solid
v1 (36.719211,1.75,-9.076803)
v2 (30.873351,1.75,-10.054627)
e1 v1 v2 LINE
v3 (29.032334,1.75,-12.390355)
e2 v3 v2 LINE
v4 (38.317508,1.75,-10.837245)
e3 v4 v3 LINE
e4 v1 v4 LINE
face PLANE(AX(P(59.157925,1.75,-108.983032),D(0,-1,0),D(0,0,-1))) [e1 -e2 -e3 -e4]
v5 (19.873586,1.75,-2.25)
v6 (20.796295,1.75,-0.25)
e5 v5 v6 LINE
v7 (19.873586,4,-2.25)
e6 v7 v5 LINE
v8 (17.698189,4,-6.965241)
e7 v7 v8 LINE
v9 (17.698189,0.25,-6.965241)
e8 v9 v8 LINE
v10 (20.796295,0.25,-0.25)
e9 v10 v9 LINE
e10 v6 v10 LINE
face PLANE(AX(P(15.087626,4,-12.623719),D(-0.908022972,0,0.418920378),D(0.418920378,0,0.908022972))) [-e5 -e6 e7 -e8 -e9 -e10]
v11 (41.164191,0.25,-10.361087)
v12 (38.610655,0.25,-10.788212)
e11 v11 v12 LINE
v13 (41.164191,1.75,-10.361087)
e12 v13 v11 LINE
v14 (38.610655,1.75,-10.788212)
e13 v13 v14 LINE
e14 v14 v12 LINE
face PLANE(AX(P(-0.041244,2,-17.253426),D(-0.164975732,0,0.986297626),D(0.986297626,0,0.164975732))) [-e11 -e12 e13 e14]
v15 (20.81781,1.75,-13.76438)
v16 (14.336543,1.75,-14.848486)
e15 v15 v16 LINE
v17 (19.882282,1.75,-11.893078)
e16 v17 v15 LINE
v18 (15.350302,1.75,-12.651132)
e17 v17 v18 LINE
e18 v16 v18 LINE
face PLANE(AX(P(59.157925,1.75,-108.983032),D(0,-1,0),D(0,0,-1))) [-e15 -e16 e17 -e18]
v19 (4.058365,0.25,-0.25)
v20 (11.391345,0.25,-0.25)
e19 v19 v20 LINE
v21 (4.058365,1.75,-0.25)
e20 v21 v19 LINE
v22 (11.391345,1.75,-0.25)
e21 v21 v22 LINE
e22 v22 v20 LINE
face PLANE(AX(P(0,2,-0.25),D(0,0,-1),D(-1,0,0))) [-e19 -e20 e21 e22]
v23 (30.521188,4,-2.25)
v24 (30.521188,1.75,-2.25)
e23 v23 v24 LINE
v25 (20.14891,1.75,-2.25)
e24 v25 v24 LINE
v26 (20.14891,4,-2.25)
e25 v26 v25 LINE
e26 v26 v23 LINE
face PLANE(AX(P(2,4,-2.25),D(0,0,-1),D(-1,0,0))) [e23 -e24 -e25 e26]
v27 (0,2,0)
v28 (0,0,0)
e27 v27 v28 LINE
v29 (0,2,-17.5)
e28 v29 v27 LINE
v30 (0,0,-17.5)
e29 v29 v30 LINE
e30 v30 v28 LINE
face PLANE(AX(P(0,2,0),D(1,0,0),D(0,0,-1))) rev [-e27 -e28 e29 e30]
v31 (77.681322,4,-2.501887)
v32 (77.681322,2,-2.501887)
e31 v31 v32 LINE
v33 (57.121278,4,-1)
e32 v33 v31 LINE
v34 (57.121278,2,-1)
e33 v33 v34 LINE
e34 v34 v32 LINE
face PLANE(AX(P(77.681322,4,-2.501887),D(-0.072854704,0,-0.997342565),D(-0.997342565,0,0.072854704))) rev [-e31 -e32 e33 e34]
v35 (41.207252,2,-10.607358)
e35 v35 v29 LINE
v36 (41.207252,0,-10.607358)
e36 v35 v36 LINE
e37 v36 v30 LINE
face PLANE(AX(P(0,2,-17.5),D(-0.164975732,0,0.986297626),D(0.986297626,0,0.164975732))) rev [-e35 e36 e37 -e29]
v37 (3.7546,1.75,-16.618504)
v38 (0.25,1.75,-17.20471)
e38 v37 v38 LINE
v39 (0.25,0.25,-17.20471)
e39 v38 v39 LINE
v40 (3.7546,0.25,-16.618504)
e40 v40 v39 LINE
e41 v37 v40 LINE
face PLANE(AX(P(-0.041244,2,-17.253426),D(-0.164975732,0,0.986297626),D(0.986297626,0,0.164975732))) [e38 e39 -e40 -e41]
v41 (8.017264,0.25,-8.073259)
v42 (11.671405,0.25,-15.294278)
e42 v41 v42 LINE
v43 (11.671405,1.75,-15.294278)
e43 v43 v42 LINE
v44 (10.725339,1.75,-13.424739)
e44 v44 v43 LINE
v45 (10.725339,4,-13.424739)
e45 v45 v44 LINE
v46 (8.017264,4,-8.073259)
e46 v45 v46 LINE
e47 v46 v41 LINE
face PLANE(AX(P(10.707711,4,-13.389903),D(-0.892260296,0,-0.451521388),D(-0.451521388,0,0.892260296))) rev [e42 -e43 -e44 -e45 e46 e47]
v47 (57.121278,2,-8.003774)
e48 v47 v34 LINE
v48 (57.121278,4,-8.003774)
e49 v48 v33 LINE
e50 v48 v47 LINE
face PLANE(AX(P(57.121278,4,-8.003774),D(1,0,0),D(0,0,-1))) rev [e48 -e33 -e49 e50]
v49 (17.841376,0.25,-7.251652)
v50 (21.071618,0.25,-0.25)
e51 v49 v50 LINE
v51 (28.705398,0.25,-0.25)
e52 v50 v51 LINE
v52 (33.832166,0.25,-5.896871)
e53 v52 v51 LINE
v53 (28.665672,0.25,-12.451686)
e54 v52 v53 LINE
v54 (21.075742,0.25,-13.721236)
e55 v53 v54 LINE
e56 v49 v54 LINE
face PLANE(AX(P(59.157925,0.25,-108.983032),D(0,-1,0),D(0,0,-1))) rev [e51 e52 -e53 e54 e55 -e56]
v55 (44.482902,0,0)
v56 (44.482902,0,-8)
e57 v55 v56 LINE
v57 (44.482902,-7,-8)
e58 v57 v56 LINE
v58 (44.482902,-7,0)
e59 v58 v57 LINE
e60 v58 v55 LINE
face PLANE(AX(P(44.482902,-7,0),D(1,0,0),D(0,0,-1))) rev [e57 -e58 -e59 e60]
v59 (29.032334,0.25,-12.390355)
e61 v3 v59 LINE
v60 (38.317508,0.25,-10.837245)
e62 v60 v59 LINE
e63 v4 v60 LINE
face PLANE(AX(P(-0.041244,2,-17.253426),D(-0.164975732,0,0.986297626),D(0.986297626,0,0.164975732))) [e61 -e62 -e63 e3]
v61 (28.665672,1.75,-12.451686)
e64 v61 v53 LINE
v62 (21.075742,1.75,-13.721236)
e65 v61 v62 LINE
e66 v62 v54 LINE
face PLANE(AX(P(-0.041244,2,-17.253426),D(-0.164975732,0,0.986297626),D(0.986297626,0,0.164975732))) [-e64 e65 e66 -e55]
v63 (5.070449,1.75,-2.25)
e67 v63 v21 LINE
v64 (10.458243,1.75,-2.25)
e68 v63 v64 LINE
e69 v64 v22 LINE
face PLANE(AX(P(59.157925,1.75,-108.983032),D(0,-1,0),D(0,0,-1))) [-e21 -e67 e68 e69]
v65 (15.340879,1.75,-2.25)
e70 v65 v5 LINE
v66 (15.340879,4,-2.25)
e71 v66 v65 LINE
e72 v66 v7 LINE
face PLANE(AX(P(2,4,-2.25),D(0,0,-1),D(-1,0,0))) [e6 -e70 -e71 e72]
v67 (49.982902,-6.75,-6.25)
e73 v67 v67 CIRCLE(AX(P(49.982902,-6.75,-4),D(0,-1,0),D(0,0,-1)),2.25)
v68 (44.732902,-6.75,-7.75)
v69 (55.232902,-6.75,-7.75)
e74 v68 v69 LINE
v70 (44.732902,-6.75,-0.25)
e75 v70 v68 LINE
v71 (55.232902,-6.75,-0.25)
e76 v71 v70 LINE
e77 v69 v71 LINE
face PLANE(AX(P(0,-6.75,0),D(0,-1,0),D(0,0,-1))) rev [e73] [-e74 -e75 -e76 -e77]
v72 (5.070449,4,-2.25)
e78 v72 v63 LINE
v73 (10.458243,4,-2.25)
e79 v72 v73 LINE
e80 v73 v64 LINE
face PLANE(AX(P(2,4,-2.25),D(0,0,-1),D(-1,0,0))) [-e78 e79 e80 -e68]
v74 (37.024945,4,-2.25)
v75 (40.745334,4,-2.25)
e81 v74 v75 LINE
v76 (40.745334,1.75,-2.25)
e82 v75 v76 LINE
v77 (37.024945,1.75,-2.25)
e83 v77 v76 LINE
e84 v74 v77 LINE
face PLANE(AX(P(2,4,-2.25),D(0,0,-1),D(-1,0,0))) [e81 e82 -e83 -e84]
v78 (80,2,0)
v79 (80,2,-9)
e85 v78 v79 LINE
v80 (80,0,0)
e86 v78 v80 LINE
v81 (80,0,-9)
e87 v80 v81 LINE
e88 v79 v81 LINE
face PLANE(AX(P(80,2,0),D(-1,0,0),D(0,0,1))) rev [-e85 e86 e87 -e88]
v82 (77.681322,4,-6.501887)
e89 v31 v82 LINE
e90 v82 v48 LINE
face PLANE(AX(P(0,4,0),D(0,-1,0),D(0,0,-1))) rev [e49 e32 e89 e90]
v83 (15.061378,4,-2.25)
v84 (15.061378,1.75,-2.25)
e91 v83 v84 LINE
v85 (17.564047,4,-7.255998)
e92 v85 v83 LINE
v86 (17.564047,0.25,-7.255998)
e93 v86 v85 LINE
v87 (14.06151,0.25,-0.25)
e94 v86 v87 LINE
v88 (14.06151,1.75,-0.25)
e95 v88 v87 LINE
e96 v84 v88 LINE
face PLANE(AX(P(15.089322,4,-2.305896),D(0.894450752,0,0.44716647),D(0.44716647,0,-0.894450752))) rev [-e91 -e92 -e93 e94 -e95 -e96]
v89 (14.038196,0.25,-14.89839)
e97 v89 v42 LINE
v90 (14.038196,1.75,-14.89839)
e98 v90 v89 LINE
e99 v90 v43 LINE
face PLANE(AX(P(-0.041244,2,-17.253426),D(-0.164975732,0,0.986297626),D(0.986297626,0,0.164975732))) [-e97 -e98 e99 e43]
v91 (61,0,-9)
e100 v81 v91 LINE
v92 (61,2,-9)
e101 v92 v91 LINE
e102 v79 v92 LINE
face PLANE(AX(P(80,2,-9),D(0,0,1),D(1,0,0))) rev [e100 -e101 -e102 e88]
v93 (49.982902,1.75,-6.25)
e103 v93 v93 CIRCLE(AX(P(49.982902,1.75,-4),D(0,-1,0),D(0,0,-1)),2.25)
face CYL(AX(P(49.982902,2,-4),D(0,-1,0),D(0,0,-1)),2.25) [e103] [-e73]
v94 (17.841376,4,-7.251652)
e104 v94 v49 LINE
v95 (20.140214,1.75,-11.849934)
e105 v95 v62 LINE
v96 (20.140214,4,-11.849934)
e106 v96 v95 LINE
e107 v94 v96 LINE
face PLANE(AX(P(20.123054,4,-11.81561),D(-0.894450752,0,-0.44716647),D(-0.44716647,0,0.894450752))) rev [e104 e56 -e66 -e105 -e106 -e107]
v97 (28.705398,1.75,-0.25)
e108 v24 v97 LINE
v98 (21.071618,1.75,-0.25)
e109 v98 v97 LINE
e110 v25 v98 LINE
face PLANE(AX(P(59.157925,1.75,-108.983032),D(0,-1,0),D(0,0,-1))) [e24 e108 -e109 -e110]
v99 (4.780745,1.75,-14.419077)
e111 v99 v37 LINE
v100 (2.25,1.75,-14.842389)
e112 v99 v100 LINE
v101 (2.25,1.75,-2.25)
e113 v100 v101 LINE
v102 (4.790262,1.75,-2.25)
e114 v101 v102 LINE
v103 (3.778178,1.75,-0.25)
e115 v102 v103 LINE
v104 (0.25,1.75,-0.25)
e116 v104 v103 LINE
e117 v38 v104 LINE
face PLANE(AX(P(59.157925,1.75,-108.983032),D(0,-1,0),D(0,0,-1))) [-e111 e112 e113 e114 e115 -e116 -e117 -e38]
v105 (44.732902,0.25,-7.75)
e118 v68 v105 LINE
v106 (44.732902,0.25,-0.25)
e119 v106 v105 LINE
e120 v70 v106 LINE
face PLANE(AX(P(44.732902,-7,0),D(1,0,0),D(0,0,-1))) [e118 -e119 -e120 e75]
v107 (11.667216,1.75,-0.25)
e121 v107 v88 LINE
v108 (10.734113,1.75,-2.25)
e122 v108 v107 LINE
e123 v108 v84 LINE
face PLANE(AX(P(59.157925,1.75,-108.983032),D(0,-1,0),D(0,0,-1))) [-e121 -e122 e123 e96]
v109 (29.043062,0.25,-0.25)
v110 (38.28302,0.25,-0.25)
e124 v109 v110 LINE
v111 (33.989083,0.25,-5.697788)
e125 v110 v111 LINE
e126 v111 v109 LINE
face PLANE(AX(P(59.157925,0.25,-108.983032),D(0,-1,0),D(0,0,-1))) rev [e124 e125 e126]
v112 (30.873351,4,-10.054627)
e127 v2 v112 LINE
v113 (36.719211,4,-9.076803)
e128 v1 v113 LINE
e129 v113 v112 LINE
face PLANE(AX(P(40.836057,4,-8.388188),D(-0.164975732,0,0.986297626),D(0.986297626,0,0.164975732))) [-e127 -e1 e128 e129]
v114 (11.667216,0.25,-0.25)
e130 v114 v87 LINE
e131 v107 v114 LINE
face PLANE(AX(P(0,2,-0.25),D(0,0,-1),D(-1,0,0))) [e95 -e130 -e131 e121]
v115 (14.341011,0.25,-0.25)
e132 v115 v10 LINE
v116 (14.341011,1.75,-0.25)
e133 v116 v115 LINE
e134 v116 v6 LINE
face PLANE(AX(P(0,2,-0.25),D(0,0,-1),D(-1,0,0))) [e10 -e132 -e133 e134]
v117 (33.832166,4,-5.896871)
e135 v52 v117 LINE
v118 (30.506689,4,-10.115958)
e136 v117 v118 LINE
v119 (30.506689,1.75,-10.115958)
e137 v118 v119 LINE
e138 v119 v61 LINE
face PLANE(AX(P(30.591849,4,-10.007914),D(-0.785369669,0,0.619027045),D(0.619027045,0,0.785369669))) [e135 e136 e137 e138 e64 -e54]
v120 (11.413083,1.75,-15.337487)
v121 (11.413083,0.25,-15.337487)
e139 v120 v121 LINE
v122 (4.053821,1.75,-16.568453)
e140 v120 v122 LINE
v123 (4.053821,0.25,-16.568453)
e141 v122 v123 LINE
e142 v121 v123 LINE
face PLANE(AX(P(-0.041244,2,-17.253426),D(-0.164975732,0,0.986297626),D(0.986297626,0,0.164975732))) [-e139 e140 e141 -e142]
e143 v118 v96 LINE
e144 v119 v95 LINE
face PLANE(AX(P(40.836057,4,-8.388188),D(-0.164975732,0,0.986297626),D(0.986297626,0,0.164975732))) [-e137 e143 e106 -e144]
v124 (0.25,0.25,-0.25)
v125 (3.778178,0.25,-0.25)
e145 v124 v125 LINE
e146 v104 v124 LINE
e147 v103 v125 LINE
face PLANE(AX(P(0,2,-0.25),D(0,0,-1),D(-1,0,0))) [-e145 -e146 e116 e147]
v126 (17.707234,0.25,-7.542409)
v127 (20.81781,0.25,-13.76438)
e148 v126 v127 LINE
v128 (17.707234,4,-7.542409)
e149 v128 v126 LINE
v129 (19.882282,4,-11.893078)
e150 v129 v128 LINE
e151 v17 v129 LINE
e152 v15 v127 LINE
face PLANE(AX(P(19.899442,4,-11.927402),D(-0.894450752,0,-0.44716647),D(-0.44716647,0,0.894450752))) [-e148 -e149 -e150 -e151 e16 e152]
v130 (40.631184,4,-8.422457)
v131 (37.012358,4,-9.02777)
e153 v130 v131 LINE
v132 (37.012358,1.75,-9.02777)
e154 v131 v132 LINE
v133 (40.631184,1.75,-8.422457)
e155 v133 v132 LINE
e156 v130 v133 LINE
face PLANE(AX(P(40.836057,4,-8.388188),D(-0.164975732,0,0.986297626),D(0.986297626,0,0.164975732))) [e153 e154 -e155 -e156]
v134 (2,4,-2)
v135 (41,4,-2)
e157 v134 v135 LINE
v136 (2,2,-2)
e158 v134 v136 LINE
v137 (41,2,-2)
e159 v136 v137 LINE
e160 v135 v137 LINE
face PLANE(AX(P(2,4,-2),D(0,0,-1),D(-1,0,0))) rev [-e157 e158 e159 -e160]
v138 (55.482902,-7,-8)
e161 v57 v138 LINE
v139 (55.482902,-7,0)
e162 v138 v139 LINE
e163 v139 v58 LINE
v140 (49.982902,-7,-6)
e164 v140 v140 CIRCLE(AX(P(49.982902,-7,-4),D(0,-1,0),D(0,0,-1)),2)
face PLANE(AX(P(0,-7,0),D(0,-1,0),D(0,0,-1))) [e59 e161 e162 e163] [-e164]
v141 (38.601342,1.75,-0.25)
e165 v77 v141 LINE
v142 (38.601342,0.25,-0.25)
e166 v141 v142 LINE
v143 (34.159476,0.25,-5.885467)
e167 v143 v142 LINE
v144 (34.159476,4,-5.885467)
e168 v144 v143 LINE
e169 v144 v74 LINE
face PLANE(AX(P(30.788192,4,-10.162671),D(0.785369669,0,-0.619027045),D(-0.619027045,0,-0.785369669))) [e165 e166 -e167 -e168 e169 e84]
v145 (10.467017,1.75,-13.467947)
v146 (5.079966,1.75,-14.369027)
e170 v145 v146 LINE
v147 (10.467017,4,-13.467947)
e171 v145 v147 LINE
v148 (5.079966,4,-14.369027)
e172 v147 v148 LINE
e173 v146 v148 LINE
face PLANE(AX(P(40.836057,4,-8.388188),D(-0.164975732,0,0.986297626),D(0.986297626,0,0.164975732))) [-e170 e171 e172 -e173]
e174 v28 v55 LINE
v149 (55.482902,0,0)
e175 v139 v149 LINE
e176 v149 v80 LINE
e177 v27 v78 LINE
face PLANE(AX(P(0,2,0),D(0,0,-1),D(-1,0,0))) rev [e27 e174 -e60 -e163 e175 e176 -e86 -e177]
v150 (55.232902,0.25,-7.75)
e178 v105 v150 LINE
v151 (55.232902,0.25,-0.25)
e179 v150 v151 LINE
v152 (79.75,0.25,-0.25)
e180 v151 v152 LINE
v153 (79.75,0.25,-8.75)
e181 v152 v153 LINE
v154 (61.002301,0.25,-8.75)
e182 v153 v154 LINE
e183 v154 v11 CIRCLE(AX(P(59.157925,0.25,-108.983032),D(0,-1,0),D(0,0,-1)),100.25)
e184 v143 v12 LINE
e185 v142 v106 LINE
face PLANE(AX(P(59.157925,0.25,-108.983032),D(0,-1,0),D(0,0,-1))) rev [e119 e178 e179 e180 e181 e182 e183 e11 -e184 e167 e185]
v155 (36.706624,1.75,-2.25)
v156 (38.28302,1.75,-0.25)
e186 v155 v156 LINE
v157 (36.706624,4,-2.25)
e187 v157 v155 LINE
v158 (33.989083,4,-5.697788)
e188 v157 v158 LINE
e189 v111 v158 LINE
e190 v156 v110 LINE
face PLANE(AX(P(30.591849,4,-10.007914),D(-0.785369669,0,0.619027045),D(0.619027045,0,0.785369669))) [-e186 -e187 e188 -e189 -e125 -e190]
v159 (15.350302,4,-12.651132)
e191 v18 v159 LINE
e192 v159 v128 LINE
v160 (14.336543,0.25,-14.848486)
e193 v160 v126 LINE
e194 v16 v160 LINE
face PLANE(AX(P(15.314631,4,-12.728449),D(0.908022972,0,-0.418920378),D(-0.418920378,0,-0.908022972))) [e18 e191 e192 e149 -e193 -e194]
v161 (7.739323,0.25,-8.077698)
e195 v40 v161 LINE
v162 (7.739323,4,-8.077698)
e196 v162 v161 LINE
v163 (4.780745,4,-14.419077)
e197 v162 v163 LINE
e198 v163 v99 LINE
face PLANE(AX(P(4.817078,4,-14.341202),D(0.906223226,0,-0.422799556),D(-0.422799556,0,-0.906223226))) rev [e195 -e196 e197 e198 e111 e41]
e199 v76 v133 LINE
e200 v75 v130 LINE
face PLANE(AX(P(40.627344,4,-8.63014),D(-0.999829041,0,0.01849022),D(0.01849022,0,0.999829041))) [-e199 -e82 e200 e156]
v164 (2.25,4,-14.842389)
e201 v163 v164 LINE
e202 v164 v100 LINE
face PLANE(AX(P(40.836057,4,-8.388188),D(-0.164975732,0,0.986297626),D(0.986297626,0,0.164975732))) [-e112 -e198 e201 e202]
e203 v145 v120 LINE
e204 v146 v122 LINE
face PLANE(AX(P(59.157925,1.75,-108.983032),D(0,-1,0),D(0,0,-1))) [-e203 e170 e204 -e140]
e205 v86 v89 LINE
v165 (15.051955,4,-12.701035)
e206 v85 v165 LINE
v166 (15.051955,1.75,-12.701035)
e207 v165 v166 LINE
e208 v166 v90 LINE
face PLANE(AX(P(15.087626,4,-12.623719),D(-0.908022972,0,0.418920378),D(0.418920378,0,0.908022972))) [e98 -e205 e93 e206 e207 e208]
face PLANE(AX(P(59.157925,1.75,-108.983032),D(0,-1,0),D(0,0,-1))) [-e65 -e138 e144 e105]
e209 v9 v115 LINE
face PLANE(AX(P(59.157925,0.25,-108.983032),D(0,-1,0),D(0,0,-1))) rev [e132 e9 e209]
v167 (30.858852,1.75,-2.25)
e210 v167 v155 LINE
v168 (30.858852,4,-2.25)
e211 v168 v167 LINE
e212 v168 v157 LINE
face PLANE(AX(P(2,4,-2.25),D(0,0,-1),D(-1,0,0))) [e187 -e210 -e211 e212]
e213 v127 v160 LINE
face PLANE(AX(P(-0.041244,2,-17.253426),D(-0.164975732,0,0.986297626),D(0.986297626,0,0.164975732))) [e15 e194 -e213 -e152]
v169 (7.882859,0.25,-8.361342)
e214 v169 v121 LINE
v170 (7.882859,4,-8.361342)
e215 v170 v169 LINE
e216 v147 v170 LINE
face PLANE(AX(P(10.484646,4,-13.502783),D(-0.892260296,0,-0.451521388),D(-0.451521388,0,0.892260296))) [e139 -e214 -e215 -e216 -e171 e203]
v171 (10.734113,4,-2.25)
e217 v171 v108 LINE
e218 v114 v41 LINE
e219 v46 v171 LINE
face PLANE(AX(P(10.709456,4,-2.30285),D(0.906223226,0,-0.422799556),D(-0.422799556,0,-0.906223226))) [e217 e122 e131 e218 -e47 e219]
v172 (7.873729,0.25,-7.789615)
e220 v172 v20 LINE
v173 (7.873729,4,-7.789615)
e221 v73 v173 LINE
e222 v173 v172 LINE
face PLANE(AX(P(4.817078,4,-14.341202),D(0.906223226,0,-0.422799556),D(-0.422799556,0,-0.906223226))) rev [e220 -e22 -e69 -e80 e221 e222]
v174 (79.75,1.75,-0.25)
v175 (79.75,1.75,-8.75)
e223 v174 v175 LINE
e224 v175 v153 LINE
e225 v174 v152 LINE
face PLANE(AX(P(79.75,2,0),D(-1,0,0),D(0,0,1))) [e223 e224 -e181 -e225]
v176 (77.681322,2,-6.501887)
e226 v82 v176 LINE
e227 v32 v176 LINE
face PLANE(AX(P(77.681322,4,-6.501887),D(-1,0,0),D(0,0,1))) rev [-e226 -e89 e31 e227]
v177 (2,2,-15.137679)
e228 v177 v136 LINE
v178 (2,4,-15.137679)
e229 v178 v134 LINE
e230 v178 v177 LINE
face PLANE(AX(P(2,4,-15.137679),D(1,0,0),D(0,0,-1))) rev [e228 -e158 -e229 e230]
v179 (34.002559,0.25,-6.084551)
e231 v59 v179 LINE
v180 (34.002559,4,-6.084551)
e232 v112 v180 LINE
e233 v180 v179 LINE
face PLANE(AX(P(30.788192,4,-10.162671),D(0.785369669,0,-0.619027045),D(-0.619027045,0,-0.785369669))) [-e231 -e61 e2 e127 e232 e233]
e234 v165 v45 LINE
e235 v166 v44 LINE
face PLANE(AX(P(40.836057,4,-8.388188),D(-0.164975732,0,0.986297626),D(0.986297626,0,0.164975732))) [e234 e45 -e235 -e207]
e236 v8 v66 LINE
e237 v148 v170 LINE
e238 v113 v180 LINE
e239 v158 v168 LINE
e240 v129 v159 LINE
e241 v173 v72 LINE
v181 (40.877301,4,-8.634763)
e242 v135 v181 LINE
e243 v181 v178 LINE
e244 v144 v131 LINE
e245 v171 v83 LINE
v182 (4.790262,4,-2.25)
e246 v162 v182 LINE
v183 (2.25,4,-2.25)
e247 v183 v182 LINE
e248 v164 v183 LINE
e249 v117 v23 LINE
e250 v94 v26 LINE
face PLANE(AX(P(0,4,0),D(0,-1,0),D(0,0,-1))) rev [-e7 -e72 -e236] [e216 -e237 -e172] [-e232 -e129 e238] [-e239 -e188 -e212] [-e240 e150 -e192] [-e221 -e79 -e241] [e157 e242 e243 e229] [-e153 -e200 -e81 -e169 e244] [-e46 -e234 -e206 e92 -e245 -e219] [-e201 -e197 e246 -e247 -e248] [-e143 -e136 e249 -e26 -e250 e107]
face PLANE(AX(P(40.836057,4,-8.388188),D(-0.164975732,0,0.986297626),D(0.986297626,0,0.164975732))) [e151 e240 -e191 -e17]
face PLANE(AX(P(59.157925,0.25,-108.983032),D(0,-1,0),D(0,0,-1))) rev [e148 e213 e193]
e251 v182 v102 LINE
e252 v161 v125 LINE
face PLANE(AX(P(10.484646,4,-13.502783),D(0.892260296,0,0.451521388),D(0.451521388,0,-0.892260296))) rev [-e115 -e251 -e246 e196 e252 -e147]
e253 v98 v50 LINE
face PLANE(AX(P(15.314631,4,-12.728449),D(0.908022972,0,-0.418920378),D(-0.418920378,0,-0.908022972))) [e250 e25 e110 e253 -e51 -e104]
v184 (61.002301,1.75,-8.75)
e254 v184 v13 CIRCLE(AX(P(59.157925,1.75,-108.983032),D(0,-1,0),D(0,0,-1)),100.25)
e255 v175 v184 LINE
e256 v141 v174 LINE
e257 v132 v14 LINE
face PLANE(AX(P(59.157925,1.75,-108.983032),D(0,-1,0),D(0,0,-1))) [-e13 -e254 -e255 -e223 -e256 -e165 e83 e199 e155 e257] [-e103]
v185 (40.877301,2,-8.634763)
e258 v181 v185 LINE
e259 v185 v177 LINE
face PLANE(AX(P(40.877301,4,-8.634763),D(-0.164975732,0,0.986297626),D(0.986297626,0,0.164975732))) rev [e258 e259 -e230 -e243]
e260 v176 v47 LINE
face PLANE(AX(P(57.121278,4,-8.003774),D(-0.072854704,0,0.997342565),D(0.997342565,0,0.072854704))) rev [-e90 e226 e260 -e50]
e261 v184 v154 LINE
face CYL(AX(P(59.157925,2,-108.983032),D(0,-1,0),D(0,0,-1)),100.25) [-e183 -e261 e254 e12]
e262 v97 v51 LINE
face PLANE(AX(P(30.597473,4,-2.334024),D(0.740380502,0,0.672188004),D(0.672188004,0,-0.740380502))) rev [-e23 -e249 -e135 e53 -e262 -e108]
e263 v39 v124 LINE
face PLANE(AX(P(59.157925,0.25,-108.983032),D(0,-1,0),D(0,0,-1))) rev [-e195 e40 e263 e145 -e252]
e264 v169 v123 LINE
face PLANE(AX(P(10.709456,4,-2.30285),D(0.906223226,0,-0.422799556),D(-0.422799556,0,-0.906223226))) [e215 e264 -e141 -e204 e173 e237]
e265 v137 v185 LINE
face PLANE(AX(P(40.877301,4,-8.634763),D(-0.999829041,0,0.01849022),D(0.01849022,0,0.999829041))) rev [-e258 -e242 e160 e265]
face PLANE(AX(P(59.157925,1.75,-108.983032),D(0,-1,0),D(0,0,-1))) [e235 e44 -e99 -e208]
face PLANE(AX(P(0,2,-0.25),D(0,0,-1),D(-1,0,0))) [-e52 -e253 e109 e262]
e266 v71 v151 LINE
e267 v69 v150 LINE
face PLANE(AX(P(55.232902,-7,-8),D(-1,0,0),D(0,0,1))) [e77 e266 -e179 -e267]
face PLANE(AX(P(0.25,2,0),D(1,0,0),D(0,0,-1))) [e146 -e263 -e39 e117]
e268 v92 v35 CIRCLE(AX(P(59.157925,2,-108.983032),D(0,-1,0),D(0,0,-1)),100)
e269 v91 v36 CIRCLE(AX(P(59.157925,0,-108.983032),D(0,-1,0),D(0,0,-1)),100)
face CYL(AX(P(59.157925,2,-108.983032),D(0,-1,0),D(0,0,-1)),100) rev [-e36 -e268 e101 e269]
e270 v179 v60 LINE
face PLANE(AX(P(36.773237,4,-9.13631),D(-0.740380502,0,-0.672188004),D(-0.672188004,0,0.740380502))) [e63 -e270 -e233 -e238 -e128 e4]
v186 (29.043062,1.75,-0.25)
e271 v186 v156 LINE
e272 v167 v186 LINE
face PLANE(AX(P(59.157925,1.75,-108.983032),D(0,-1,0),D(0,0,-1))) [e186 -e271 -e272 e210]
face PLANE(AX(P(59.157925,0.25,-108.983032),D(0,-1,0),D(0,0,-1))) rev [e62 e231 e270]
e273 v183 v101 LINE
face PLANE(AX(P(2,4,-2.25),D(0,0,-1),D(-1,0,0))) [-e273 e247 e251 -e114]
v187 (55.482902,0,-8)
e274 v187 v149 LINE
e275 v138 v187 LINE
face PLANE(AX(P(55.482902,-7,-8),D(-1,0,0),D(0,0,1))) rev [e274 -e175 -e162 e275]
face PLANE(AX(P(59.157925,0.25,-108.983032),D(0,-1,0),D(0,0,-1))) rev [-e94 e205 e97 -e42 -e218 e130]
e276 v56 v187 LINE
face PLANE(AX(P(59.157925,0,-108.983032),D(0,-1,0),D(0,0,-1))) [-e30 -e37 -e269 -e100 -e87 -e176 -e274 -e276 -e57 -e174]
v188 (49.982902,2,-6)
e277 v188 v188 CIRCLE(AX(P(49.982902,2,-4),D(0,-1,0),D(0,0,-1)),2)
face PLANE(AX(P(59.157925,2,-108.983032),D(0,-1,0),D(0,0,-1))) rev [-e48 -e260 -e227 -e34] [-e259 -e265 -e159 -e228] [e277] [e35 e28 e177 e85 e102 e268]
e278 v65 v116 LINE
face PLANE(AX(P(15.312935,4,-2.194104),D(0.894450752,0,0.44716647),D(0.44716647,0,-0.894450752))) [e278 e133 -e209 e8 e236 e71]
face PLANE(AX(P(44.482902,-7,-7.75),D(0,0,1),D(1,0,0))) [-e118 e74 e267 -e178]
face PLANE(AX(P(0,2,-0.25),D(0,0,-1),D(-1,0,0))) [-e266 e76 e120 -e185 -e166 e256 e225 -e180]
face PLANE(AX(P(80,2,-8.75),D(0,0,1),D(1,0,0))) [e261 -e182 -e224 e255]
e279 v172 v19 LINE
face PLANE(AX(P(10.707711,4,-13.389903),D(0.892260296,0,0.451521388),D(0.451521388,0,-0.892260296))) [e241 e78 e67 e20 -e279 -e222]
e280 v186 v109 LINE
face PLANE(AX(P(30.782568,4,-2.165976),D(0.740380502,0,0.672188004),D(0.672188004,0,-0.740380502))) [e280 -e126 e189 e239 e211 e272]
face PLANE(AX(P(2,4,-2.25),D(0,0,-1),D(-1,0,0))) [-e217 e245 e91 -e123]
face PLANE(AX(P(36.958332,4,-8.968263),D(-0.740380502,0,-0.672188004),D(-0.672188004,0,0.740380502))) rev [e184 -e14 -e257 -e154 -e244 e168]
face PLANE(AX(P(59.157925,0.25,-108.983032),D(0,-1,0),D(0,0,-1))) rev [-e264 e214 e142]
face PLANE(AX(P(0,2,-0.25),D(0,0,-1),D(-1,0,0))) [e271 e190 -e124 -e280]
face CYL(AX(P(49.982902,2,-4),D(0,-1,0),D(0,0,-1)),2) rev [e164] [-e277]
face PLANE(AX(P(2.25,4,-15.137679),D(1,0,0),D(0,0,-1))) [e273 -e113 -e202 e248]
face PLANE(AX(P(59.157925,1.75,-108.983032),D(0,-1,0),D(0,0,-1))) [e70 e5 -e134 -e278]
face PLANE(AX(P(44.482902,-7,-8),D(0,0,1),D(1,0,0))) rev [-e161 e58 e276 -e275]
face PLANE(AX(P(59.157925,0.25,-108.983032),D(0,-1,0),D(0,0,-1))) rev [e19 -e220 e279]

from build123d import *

# Parameters (mm, degrees)
BOSS_EXTRUDE1_DEPTH = 2
SKETCH2_W           = 11
SKETCH2_H           = 8
BOSS_EXTRUDE2_DEPTH = 7
SKETCH3_R           = 2
CUT_EXTRUDE2_DEPTH  = 83.38476801
BOSS_EXTRUDE3_DEPTH = 2
SHELL1_START        = 0.25
SHELL1_DEPTH        = 3.75
SHELL1_2_OUTLINE_R  = 2.25
SHELL1_2_DEPTH      = 1.5
SHELL1_START_2      = -6.75
SHELL1_3_OUTLINE_W  = 10.5
SHELL1_3_OUTLINE_H  = 7.5
SHELL1_3_OUTLINE_R  = 2.25
SHELL1_3_DEPTH      = 7
RIB2_REACH          = 84.627
BOSS_EXTRUDE4_DEPTH = 2


# Read off the part's stored shape, not the designer's step: Shell1
with BuildPart() as part:
    # Sketch1 → Boss-Extrude1 (new body)
    with BuildSketch(Plane(origin=(0, 0, 0), x_dir=(1, 0, 0), z_dir=(0, 1, 0))):
        with BuildLine():
            Line((0, 0), (0, 17.5))
            Line((0, 17.5), (41.207252266, 10.607357821))
            ThreePointArc((41.207252266, 10.607357821), (51.063628859, 9.311158863), (61, 9))
            Line((61, 9), (80, 9))
            Line((80, 9), (80, 0))
            Line((80, 0), (0, 0))
        make_face()
    extrude(amount=BOSS_EXTRUDE1_DEPTH)

    # Sketch2 → Boss-Extrude2 (add)
    with BuildSketch(Plane.XZ):
        with Locations((49.982902032, -4)):
            Rectangle(SKETCH2_W, SKETCH2_H)
    extrude(amount=BOSS_EXTRUDE2_DEPTH)

    # Sketch3 → Cut-Extrude2 (cut, through all)
    with BuildSketch(Plane.XZ.offset(7)):
        with Locations(Location((49.982902032, -4, 0), (0, 0, 270))):
            Circle(SKETCH3_R)
    extrude(amount=-CUT_EXTRUDE2_DEPTH, mode=Mode.SUBTRACT)

    # Sketch4 → Boss-Extrude3 (add)
    with BuildSketch(Plane(origin=(0, 2, 0), x_dir=(1, 0, 0), z_dir=(0, 1, 0))):
        Polygon((40.877300801, 8.634762569), (41, 2), (2, 2), (2, 15.137679132), align=None)
    extrude(amount=BOSS_EXTRUDE3_DEPTH)

    # Shell1 outline → Shell1 (cut)
    with BuildSketch(Plane(origin=(0, 0, 0), x_dir=(1, 0, 0), z_dir=(0, 1, 0)).offset(SHELL1_START)):
        Polygon((2.25, 2.25), (40.745333907, 2.25), (40.631184307, 8.422456723), (2.25, 14.842389024), align=None)
    extrude(amount=SHELL1_DEPTH, mode=Mode.SUBTRACT)

    # Shell1 2 outline → Shell1 2 (cut)
    with BuildSketch(Plane(origin=(0, 0, 0), x_dir=(1, 0, 0), z_dir=(0, 1, 0)).offset(SHELL1_START)):
        with BuildLine():
            Line((79.75, 0.25), (79.75, 8.75))
            Line((79.75, 8.75), (61.002301351, 8.75))
            ThreePointArc((61.002301351, 8.75), (51.043164326, 9.06199776), (41.164190751, 10.361087437))
            Line((41.164190751, 10.361087437), (0.25, 17.204709892))
            Line((0.25, 17.204709892), (0.25, 0.25))
            Line((0.25, 0.25), (79.75, 0.25))
        make_face()
        Polygon((40.631184307, 8.422456723), (40.745333907, 2.25), (2.25, 2.25), (2.25, 14.842389024), align=None, mode=Mode.SUBTRACT)
        with Locations((49.982902032, 4)):
            Circle(SHELL1_2_OUTLINE_R, mode=Mode.SUBTRACT)
    extrude(amount=SHELL1_2_DEPTH, mode=Mode.SUBTRACT)

    # Shell1 3 outline → Shell1 3 (cut)
    with BuildSketch(Plane(origin=(0, 0, 0), x_dir=(1, 0, 0), z_dir=(0, 1, 0)).offset(SHELL1_START_2)):
        with Locations((49.982902032, 4)):
            Rectangle(SHELL1_3_OUTLINE_W, SHELL1_3_OUTLINE_H)
        with Locations((49.982902032, 4)):
            Circle(SHELL1_3_OUTLINE_R, mode=Mode.SUBTRACT)
    extrude(amount=SHELL1_3_DEPTH, mode=Mode.SUBTRACT)

    # Sketch8 walls → Rib2 (add, up to next)
    with BuildSketch(Plane(origin=(0, 4, 0), x_dir=(1, 0, 0), z_dir=(0, 1, 0)), mode=Mode.PRIVATE) as rib2_sk1:
        Polygon((-30.5404545, 90.126090222), (45.840432464, -73.587738012), (46.06698827, -73.482038123), (-30.313898694, 90.231790111), align=None)
    rib2_tool1 = extrude(rib2_sk1.sketch, amount=-RIB2_REACH, mode=Mode.PRIVATE) - part.part
    # Sketch8 walls → Rib2 (add, up to next)
    with BuildSketch(Plane(origin=(0, 4, 0), x_dir=(1, 0, 0), z_dir=(0, 1, 0)), mode=Mode.PRIVATE) as rib2_sk2:
        Polygon((48.244103521, 88.119990894), (-32.940634825, -72.310767507), (-32.717569751, -72.423647853), (48.467168595, 88.007110547), align=None)
    rib2_tool2 = extrude(rib2_sk2.sketch, amount=-RIB2_REACH, mode=Mode.PRIVATE) - part.part
    # Sketch8 walls → Rib2 (add, up to next)
    with BuildSketch(Plane(origin=(0, 4, 0), x_dir=(1, 0, 0), z_dir=(0, 1, 0)), mode=Mode.PRIVATE) as rib2_sk3:
        Polygon((-19.945501862, 88.559114212), (54.930872718, -73.737760739), (55.15787846, -73.633030645), (-19.718496119, 88.663844307), align=None)
    rib2_tool3 = extrude(rib2_sk3.sketch, amount=-RIB2_REACH, mode=Mode.PRIVATE) - part.part
    # Sketch8 walls → Rib2 (add, up to next)
    with BuildSketch(Plane(origin=(0, 4, 0), x_dir=(1, 0, 0), z_dir=(0, 1, 0)), mode=Mode.PRIVATE) as rib2_sk4:
        Polygon((57.294710169, 86.727791097), (-22.305946259, -72.494493497), (-22.082333571, -72.606285115), (57.518322857, 86.615999479), align=None)
    rib2_tool4 = extrude(rib2_sk4.sketch, amount=-RIB2_REACH, mode=Mode.PRIVATE) - part.part
    # Sketch8 walls → Rib2 (add, up to next)
    with BuildSketch(Plane(origin=(0, 4, 0), x_dir=(1, 0, 0), z_dir=(0, 1, 0)), mode=Mode.PRIVATE) as rib2_sk5:
        Polygon((-21.175633704, 75.686160498), (88.535096121, -63.505624935), (88.731438538, -63.350868173), (-20.979291286, 75.840917259), align=None)
    rib2_tool5 = extrude(rib2_sk5.sketch, amount=-RIB2_REACH, mode=Mode.PRIVATE) - part.part
    # Sketch8 walls → Rib2 (add, up to next)
    with BuildSketch(Plane(origin=(0, 4, 0), x_dir=(1, 0, 0), z_dir=(0, 1, 0)), mode=Mode.PRIVATE) as rib2_sk6:
        Polygon((92.986420538, 71.052239579), (-25.615710829, -59.5819061), (-25.430615704, -59.749953101), (93.171515663, 70.884192578), align=None)
    rib2_tool6 = extrude(rib2_sk6.sketch, amount=-RIB2_REACH, mode=Mode.PRIVATE) - part.part
    add(rib2_tool1.solids().sort_by_distance((7.763266885, 4, -8.32202605))[0])
    add(rib2_tool2.solids().sort_by_distance((7.763266885, 4, -7.84817152))[0])
    add(rib2_tool3.solids().sort_by_distance((17.606188299, 4, -7.463041784))[0])
    add(rib2_tool4.solids().sort_by_distance((17.606188299, 4, -7.060752991))[0])
    add(rib2_tool5.solids().sort_by_distance((33.777902417, 4, -6.167646162))[0])
    add(rib2_tool6.solids().sort_by_distance((33.777902417, 4, -5.651143239))[0])

    # Sketch9 → Boss-Extrude4 (add)
    with BuildSketch(Plane(origin=(0, 2, 0), x_dir=(1, 0, 0), z_dir=(0, 1, 0))):
        Polygon((77.681321794, 6.50188709), (77.681321794, 2.50188709), (57.121277642, 1), (57.121277642, 8.00377418), align=None)
    extrude(amount=BOSS_EXTRUDE4_DEPTH)


solid = part.part
